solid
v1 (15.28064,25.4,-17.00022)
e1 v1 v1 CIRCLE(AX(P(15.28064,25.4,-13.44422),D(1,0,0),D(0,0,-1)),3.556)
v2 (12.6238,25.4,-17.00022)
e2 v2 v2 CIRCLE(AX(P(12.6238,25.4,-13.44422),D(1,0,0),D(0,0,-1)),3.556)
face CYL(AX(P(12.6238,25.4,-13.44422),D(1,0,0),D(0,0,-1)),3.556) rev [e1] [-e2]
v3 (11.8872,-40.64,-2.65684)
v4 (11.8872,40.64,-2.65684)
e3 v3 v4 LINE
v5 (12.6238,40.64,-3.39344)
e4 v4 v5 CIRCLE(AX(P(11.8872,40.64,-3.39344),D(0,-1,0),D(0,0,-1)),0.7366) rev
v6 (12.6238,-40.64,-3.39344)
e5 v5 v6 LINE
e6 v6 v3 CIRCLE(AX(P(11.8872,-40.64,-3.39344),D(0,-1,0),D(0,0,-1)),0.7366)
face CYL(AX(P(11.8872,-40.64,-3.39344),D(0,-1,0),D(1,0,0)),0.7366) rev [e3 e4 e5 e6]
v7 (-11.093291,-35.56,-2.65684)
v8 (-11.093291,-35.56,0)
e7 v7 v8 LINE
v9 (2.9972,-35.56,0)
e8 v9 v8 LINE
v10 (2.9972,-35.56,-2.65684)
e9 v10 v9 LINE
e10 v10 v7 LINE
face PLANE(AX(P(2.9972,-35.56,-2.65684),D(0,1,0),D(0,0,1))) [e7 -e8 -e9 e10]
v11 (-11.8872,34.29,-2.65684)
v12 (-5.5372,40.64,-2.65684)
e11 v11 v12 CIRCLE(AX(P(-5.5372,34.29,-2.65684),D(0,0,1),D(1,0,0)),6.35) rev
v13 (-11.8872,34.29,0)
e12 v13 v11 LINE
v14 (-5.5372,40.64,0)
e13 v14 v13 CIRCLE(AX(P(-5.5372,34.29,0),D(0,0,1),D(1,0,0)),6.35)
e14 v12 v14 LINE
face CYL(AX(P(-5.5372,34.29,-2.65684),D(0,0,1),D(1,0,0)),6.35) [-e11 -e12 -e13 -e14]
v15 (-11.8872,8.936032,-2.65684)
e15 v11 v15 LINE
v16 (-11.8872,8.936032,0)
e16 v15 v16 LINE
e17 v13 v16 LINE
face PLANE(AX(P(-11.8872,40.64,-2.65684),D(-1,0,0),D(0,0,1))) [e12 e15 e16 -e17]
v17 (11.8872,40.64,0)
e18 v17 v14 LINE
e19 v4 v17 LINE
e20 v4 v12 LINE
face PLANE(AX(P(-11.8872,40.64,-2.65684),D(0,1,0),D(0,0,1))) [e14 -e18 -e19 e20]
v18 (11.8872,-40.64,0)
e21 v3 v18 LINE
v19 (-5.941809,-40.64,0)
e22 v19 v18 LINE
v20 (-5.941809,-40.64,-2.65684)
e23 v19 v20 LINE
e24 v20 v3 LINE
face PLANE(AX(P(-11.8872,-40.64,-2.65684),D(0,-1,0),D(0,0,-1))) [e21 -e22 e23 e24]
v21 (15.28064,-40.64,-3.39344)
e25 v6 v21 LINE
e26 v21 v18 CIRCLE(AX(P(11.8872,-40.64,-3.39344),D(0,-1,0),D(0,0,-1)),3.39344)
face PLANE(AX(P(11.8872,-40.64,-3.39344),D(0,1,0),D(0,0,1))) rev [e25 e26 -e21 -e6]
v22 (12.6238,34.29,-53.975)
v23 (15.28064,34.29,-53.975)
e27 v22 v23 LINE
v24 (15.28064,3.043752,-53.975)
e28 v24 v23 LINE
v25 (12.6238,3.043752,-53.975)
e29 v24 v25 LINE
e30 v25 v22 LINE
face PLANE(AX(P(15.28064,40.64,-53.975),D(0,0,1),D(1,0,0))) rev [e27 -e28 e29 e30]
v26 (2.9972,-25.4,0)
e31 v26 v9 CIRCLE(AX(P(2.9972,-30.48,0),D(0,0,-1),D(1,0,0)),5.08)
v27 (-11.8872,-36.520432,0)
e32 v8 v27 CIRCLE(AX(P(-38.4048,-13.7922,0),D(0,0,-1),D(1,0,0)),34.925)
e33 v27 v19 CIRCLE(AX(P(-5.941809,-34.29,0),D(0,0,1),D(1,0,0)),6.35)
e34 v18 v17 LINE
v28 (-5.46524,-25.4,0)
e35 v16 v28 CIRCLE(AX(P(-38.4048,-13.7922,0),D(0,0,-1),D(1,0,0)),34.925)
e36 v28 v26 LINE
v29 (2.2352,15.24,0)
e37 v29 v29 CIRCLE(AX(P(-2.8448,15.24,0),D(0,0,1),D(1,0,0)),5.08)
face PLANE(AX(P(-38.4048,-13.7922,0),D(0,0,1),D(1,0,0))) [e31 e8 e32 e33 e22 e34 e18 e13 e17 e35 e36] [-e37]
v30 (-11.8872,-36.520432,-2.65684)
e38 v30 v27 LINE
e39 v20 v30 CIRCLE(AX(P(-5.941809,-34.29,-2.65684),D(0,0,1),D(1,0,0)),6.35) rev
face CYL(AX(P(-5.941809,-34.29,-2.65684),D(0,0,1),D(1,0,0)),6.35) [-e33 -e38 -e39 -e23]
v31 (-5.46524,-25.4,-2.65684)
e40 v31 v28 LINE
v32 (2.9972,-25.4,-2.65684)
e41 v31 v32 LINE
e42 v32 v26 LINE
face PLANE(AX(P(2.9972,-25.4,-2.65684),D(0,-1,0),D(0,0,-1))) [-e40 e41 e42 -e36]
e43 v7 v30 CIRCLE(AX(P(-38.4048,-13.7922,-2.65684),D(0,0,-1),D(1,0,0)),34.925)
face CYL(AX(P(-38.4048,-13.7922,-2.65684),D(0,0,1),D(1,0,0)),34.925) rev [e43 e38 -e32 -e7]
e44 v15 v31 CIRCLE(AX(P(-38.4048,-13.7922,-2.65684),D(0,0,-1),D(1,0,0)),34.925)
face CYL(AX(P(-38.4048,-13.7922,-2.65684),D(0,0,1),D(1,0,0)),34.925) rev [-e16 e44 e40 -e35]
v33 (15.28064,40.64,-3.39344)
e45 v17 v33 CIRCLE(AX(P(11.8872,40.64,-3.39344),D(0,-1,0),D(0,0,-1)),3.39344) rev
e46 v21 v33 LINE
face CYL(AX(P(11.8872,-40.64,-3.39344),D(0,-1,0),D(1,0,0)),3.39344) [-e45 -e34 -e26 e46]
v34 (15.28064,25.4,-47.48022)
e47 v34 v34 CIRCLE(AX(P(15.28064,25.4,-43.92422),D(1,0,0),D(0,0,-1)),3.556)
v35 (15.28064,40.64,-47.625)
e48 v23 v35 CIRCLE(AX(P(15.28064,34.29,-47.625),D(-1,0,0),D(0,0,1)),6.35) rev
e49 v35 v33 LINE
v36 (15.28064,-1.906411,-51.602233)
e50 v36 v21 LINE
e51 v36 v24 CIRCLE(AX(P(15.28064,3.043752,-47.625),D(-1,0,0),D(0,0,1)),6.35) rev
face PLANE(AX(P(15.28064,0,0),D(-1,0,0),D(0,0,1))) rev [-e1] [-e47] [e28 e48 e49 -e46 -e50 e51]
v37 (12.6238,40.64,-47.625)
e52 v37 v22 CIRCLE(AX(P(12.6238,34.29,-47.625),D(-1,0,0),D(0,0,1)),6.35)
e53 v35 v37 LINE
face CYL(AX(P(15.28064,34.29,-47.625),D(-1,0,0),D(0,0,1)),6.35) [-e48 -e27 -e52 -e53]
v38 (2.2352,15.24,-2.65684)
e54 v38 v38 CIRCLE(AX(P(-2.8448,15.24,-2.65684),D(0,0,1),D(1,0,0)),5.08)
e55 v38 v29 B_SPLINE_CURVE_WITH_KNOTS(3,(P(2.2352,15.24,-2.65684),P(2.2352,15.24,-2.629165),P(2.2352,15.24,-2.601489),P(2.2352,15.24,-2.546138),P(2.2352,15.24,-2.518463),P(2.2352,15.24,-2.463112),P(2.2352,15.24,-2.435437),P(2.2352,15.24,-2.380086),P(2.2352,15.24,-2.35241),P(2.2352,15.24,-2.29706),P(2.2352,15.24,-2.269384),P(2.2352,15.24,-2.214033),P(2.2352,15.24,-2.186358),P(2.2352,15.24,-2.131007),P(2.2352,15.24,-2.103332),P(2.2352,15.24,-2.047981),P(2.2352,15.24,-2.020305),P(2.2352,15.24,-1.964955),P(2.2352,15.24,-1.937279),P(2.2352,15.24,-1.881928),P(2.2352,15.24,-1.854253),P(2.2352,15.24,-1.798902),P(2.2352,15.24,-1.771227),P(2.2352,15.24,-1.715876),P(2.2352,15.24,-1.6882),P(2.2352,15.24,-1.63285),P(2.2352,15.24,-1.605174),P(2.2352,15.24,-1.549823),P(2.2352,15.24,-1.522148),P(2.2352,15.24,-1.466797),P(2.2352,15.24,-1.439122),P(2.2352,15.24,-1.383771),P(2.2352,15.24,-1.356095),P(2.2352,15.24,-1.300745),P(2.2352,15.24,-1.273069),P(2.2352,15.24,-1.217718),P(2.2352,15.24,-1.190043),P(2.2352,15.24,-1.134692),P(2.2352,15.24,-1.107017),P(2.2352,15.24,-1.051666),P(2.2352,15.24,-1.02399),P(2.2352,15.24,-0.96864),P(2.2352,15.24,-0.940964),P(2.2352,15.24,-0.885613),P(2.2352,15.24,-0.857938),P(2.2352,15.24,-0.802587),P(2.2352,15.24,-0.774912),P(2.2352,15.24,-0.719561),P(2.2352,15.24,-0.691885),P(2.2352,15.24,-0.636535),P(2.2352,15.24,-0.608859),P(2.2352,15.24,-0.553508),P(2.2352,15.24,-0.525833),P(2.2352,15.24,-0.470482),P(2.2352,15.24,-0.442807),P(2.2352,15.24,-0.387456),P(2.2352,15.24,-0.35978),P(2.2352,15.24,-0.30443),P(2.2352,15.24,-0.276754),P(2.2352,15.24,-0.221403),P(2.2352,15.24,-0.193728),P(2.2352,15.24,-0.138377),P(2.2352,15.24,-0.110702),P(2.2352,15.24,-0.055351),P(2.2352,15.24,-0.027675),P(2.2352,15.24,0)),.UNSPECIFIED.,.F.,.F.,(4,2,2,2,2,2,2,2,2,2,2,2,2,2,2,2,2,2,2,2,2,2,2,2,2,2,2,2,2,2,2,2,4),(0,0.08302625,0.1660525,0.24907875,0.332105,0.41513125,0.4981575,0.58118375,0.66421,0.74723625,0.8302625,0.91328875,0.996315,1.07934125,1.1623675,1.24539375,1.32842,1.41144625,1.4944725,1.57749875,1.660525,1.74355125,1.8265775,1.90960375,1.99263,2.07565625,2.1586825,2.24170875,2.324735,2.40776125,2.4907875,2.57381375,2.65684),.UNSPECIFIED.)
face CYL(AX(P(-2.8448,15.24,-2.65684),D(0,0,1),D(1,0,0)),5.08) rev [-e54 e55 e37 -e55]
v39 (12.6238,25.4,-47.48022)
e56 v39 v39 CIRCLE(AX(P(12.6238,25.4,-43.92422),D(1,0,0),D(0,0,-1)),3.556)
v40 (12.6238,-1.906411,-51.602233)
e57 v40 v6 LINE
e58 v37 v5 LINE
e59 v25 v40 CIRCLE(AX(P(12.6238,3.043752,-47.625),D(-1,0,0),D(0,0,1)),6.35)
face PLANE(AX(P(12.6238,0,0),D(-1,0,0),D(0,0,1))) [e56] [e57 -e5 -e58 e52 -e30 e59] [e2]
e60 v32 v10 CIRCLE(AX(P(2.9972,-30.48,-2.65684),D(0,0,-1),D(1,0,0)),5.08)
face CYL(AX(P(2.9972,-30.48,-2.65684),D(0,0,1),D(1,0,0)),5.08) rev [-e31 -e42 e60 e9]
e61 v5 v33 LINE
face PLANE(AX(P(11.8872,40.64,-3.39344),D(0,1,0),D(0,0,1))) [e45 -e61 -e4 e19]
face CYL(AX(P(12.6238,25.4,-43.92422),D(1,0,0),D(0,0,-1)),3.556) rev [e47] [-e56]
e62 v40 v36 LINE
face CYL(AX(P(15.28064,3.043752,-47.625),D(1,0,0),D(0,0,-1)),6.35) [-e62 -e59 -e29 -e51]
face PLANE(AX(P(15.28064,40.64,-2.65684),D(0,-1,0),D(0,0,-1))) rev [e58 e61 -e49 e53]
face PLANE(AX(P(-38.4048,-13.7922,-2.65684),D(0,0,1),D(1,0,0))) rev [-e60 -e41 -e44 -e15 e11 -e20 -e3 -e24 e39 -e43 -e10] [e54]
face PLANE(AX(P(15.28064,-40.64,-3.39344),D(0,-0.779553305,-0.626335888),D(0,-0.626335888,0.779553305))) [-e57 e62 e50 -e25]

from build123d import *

# Parameters (mm, degrees)
SKETCH2_R          = 5.08
BASE_FLANGE2_DEPTH = 2.65684
EDGE_FLANGE2_DEPTH = 81.28
SKETCH18_R         = 3.556
CUT_EXTRUDE1_DEPTH = 2.65684
FILLET1_R          = 6.35


# Sheet-metal steps are written as plain solids
with BuildPart() as part:
    # Sketch2 → Base-Flange2 (new body)
    with BuildSketch(Plane.XY):
        with BuildLine():
            Line((-11.8872, -36.520431679), (-11.8872, -40.64))
            Line((-11.8872, -40.64), (11.8872, -40.64))
            Line((11.8872, -40.64), (11.8872, 40.64))
            Line((11.8872, 40.64), (-11.8872, 40.64))
            Line((-11.8872, 40.64), (-11.8872, 8.936031679))
            ThreePointArc((-11.8872, 8.936031679), (-4.075086446, -7.37142183), (-5.465240134, -25.4))
            Line((-5.465240134, -25.4), (2.9972, -25.4))
            ThreePointArc((2.9972, -25.4), (8.0772, -30.48), (2.9972, -35.56))
            Line((2.9972, -35.56), (-11.093291287, -35.56))
            ThreePointArc((-11.093291287, -35.56), (-11.485961922, -36.043756834), (-11.8872, -36.520431679))
        make_face()
        with Locations((-2.8448, 15.24)):
            Circle(SKETCH2_R, mode=Mode.SUBTRACT)
    extrude(amount=-BASE_FLANGE2_DEPTH)

    # Edge-Flange2 section (across the edge) → Edge-Flange2 (add)
    with BuildSketch(Plane(origin=(12.6238, 40.64, -2.65684), x_dir=(-1, 0, 0), z_dir=(0, -1, 0))):
        with BuildLine():
            Line((-2.65684, 0.7366), (-2.65684, 51.31816))
            Line((-2.65684, 51.31816), (0, 51.31816))
            Line((0, 51.31816), (0, 0.7366))
            ThreePointArc((0, 0.7366), (0.215745145, 0.215745145), (0.7366, 0))
            Line((0.7366, 0), (0.7366, -2.65684))
            ThreePointArc((0.7366, -2.65684), (-1.662924436, -1.662924436), (-2.65684, 0.7366))
        make_face()
    extrude(amount=EDGE_FLANGE2_DEPTH)

    # Sketch18 → Cut-Extrude1 (cut)
    with BuildSketch(Plane(origin=(15.28064, 0, 0), x_dir=(0, 0, -1), z_dir=(1, 0, 0))):
        with Locations((13.44422, 25.4)):
            Circle(SKETCH18_R)
        with Locations((43.92422, 25.4)):
            Circle(SKETCH18_R)
        Polygon((53.975, 0), (53.975, -40.64), (3.39344, -40.64), align=None)
    extrude(amount=-CUT_EXTRUDE1_DEPTH, mode=Mode.SUBTRACT)

    # Fillet1
    # the kernel refuses this fillet: 6.35 mm, written as the material it takes off along each edge
    with BuildSketch(Plane(origin=(-11.8872, 40.64, 15.875), x_dir=(0, -1, 0), z_dir=(0, 0, -1)), Plane(origin=(31.15564, 40.64, -53.975), x_dir=(0, 0, 1), z_dir=(-1, 0, 0))) as fillet1_piece_1:
        with BuildLine():
            CenterArc((FILLET1_R, -FILLET1_R), FILLET1_R, 90, 90)
            Line((0, -FILLET1_R), (-FILLET1_R * 0.02, -FILLET1_R))
            Line((-FILLET1_R * 0.02, -FILLET1_R), (-FILLET1_R * 0.02, FILLET1_R * 0.02))
            Line((-FILLET1_R * 0.02, FILLET1_R * 0.02), (FILLET1_R, FILLET1_R * 0.02))
            Line((FILLET1_R, FILLET1_R * 0.02), (FILLET1_R, 0))
        make_face()
    extrude(amount=34.40684, mode=Mode.SUBTRACT)
    with BuildSketch(Plane(origin=(-11.8872, -40.64, 14.863477581), x_dir=(0, 1, 0), z_dir=(0, 0, -1))) as fillet1_piece_2:
        with BuildLine():
            CenterArc((6.35, 5.945391032), FILLET1_R, 180, 69.436266332)
            Line((0, 5.945391032), (-0.127, 5.945391032))
            Line((-0.127, 5.945391032), (-0.127, 0))
            Line((-0.127, 0), (0, -0.127))
            ThreePointArc((0, -0.127), (2.059784161, -0.127), (4.074959688, -0.118907821))
            Line((4.074959688, -0.118907821), (4.119568321, 0))
        make_face()
    extrude(amount=32.383795161, mode=Mode.SUBTRACT)
    with BuildSketch(Plane(origin=(22.890020574, 0, -53.975), x_dir=(-2.7142023433715092e-15, -0.6263358882152561, 0.7795533048699147), z_dir=(-1, 0, 0))) as fillet1_piece_3:
        with BuildLine():
            CenterArc((FILLET1_R * 0.479331059788, FILLET1_R), FILLET1_R, 218.780305406, 51.219694594)
            Line((-FILLET1_R * 0.300222245082, FILLET1_R * 0.373664111785), (-FILLET1_R * 0.315813311179, FILLET1_R * 0.36113739402))
            Line((-FILLET1_R * 0.315813311179, FILLET1_R * 0.36113739402), (-FILLET1_R * 0.00958662119577, -FILLET1_R * 0.02))
            Line((-FILLET1_R * 0.00958662119577, -FILLET1_R * 0.02), (FILLET1_R * 0.479331059788, -FILLET1_R * 0.02))
            Line((FILLET1_R * 0.479331059788, -FILLET1_R * 0.02), (FILLET1_R * 0.479331059788, 0))
        make_face()
    extrude(amount=17.875601148, mode=Mode.SUBTRACT)


solid = part.part
